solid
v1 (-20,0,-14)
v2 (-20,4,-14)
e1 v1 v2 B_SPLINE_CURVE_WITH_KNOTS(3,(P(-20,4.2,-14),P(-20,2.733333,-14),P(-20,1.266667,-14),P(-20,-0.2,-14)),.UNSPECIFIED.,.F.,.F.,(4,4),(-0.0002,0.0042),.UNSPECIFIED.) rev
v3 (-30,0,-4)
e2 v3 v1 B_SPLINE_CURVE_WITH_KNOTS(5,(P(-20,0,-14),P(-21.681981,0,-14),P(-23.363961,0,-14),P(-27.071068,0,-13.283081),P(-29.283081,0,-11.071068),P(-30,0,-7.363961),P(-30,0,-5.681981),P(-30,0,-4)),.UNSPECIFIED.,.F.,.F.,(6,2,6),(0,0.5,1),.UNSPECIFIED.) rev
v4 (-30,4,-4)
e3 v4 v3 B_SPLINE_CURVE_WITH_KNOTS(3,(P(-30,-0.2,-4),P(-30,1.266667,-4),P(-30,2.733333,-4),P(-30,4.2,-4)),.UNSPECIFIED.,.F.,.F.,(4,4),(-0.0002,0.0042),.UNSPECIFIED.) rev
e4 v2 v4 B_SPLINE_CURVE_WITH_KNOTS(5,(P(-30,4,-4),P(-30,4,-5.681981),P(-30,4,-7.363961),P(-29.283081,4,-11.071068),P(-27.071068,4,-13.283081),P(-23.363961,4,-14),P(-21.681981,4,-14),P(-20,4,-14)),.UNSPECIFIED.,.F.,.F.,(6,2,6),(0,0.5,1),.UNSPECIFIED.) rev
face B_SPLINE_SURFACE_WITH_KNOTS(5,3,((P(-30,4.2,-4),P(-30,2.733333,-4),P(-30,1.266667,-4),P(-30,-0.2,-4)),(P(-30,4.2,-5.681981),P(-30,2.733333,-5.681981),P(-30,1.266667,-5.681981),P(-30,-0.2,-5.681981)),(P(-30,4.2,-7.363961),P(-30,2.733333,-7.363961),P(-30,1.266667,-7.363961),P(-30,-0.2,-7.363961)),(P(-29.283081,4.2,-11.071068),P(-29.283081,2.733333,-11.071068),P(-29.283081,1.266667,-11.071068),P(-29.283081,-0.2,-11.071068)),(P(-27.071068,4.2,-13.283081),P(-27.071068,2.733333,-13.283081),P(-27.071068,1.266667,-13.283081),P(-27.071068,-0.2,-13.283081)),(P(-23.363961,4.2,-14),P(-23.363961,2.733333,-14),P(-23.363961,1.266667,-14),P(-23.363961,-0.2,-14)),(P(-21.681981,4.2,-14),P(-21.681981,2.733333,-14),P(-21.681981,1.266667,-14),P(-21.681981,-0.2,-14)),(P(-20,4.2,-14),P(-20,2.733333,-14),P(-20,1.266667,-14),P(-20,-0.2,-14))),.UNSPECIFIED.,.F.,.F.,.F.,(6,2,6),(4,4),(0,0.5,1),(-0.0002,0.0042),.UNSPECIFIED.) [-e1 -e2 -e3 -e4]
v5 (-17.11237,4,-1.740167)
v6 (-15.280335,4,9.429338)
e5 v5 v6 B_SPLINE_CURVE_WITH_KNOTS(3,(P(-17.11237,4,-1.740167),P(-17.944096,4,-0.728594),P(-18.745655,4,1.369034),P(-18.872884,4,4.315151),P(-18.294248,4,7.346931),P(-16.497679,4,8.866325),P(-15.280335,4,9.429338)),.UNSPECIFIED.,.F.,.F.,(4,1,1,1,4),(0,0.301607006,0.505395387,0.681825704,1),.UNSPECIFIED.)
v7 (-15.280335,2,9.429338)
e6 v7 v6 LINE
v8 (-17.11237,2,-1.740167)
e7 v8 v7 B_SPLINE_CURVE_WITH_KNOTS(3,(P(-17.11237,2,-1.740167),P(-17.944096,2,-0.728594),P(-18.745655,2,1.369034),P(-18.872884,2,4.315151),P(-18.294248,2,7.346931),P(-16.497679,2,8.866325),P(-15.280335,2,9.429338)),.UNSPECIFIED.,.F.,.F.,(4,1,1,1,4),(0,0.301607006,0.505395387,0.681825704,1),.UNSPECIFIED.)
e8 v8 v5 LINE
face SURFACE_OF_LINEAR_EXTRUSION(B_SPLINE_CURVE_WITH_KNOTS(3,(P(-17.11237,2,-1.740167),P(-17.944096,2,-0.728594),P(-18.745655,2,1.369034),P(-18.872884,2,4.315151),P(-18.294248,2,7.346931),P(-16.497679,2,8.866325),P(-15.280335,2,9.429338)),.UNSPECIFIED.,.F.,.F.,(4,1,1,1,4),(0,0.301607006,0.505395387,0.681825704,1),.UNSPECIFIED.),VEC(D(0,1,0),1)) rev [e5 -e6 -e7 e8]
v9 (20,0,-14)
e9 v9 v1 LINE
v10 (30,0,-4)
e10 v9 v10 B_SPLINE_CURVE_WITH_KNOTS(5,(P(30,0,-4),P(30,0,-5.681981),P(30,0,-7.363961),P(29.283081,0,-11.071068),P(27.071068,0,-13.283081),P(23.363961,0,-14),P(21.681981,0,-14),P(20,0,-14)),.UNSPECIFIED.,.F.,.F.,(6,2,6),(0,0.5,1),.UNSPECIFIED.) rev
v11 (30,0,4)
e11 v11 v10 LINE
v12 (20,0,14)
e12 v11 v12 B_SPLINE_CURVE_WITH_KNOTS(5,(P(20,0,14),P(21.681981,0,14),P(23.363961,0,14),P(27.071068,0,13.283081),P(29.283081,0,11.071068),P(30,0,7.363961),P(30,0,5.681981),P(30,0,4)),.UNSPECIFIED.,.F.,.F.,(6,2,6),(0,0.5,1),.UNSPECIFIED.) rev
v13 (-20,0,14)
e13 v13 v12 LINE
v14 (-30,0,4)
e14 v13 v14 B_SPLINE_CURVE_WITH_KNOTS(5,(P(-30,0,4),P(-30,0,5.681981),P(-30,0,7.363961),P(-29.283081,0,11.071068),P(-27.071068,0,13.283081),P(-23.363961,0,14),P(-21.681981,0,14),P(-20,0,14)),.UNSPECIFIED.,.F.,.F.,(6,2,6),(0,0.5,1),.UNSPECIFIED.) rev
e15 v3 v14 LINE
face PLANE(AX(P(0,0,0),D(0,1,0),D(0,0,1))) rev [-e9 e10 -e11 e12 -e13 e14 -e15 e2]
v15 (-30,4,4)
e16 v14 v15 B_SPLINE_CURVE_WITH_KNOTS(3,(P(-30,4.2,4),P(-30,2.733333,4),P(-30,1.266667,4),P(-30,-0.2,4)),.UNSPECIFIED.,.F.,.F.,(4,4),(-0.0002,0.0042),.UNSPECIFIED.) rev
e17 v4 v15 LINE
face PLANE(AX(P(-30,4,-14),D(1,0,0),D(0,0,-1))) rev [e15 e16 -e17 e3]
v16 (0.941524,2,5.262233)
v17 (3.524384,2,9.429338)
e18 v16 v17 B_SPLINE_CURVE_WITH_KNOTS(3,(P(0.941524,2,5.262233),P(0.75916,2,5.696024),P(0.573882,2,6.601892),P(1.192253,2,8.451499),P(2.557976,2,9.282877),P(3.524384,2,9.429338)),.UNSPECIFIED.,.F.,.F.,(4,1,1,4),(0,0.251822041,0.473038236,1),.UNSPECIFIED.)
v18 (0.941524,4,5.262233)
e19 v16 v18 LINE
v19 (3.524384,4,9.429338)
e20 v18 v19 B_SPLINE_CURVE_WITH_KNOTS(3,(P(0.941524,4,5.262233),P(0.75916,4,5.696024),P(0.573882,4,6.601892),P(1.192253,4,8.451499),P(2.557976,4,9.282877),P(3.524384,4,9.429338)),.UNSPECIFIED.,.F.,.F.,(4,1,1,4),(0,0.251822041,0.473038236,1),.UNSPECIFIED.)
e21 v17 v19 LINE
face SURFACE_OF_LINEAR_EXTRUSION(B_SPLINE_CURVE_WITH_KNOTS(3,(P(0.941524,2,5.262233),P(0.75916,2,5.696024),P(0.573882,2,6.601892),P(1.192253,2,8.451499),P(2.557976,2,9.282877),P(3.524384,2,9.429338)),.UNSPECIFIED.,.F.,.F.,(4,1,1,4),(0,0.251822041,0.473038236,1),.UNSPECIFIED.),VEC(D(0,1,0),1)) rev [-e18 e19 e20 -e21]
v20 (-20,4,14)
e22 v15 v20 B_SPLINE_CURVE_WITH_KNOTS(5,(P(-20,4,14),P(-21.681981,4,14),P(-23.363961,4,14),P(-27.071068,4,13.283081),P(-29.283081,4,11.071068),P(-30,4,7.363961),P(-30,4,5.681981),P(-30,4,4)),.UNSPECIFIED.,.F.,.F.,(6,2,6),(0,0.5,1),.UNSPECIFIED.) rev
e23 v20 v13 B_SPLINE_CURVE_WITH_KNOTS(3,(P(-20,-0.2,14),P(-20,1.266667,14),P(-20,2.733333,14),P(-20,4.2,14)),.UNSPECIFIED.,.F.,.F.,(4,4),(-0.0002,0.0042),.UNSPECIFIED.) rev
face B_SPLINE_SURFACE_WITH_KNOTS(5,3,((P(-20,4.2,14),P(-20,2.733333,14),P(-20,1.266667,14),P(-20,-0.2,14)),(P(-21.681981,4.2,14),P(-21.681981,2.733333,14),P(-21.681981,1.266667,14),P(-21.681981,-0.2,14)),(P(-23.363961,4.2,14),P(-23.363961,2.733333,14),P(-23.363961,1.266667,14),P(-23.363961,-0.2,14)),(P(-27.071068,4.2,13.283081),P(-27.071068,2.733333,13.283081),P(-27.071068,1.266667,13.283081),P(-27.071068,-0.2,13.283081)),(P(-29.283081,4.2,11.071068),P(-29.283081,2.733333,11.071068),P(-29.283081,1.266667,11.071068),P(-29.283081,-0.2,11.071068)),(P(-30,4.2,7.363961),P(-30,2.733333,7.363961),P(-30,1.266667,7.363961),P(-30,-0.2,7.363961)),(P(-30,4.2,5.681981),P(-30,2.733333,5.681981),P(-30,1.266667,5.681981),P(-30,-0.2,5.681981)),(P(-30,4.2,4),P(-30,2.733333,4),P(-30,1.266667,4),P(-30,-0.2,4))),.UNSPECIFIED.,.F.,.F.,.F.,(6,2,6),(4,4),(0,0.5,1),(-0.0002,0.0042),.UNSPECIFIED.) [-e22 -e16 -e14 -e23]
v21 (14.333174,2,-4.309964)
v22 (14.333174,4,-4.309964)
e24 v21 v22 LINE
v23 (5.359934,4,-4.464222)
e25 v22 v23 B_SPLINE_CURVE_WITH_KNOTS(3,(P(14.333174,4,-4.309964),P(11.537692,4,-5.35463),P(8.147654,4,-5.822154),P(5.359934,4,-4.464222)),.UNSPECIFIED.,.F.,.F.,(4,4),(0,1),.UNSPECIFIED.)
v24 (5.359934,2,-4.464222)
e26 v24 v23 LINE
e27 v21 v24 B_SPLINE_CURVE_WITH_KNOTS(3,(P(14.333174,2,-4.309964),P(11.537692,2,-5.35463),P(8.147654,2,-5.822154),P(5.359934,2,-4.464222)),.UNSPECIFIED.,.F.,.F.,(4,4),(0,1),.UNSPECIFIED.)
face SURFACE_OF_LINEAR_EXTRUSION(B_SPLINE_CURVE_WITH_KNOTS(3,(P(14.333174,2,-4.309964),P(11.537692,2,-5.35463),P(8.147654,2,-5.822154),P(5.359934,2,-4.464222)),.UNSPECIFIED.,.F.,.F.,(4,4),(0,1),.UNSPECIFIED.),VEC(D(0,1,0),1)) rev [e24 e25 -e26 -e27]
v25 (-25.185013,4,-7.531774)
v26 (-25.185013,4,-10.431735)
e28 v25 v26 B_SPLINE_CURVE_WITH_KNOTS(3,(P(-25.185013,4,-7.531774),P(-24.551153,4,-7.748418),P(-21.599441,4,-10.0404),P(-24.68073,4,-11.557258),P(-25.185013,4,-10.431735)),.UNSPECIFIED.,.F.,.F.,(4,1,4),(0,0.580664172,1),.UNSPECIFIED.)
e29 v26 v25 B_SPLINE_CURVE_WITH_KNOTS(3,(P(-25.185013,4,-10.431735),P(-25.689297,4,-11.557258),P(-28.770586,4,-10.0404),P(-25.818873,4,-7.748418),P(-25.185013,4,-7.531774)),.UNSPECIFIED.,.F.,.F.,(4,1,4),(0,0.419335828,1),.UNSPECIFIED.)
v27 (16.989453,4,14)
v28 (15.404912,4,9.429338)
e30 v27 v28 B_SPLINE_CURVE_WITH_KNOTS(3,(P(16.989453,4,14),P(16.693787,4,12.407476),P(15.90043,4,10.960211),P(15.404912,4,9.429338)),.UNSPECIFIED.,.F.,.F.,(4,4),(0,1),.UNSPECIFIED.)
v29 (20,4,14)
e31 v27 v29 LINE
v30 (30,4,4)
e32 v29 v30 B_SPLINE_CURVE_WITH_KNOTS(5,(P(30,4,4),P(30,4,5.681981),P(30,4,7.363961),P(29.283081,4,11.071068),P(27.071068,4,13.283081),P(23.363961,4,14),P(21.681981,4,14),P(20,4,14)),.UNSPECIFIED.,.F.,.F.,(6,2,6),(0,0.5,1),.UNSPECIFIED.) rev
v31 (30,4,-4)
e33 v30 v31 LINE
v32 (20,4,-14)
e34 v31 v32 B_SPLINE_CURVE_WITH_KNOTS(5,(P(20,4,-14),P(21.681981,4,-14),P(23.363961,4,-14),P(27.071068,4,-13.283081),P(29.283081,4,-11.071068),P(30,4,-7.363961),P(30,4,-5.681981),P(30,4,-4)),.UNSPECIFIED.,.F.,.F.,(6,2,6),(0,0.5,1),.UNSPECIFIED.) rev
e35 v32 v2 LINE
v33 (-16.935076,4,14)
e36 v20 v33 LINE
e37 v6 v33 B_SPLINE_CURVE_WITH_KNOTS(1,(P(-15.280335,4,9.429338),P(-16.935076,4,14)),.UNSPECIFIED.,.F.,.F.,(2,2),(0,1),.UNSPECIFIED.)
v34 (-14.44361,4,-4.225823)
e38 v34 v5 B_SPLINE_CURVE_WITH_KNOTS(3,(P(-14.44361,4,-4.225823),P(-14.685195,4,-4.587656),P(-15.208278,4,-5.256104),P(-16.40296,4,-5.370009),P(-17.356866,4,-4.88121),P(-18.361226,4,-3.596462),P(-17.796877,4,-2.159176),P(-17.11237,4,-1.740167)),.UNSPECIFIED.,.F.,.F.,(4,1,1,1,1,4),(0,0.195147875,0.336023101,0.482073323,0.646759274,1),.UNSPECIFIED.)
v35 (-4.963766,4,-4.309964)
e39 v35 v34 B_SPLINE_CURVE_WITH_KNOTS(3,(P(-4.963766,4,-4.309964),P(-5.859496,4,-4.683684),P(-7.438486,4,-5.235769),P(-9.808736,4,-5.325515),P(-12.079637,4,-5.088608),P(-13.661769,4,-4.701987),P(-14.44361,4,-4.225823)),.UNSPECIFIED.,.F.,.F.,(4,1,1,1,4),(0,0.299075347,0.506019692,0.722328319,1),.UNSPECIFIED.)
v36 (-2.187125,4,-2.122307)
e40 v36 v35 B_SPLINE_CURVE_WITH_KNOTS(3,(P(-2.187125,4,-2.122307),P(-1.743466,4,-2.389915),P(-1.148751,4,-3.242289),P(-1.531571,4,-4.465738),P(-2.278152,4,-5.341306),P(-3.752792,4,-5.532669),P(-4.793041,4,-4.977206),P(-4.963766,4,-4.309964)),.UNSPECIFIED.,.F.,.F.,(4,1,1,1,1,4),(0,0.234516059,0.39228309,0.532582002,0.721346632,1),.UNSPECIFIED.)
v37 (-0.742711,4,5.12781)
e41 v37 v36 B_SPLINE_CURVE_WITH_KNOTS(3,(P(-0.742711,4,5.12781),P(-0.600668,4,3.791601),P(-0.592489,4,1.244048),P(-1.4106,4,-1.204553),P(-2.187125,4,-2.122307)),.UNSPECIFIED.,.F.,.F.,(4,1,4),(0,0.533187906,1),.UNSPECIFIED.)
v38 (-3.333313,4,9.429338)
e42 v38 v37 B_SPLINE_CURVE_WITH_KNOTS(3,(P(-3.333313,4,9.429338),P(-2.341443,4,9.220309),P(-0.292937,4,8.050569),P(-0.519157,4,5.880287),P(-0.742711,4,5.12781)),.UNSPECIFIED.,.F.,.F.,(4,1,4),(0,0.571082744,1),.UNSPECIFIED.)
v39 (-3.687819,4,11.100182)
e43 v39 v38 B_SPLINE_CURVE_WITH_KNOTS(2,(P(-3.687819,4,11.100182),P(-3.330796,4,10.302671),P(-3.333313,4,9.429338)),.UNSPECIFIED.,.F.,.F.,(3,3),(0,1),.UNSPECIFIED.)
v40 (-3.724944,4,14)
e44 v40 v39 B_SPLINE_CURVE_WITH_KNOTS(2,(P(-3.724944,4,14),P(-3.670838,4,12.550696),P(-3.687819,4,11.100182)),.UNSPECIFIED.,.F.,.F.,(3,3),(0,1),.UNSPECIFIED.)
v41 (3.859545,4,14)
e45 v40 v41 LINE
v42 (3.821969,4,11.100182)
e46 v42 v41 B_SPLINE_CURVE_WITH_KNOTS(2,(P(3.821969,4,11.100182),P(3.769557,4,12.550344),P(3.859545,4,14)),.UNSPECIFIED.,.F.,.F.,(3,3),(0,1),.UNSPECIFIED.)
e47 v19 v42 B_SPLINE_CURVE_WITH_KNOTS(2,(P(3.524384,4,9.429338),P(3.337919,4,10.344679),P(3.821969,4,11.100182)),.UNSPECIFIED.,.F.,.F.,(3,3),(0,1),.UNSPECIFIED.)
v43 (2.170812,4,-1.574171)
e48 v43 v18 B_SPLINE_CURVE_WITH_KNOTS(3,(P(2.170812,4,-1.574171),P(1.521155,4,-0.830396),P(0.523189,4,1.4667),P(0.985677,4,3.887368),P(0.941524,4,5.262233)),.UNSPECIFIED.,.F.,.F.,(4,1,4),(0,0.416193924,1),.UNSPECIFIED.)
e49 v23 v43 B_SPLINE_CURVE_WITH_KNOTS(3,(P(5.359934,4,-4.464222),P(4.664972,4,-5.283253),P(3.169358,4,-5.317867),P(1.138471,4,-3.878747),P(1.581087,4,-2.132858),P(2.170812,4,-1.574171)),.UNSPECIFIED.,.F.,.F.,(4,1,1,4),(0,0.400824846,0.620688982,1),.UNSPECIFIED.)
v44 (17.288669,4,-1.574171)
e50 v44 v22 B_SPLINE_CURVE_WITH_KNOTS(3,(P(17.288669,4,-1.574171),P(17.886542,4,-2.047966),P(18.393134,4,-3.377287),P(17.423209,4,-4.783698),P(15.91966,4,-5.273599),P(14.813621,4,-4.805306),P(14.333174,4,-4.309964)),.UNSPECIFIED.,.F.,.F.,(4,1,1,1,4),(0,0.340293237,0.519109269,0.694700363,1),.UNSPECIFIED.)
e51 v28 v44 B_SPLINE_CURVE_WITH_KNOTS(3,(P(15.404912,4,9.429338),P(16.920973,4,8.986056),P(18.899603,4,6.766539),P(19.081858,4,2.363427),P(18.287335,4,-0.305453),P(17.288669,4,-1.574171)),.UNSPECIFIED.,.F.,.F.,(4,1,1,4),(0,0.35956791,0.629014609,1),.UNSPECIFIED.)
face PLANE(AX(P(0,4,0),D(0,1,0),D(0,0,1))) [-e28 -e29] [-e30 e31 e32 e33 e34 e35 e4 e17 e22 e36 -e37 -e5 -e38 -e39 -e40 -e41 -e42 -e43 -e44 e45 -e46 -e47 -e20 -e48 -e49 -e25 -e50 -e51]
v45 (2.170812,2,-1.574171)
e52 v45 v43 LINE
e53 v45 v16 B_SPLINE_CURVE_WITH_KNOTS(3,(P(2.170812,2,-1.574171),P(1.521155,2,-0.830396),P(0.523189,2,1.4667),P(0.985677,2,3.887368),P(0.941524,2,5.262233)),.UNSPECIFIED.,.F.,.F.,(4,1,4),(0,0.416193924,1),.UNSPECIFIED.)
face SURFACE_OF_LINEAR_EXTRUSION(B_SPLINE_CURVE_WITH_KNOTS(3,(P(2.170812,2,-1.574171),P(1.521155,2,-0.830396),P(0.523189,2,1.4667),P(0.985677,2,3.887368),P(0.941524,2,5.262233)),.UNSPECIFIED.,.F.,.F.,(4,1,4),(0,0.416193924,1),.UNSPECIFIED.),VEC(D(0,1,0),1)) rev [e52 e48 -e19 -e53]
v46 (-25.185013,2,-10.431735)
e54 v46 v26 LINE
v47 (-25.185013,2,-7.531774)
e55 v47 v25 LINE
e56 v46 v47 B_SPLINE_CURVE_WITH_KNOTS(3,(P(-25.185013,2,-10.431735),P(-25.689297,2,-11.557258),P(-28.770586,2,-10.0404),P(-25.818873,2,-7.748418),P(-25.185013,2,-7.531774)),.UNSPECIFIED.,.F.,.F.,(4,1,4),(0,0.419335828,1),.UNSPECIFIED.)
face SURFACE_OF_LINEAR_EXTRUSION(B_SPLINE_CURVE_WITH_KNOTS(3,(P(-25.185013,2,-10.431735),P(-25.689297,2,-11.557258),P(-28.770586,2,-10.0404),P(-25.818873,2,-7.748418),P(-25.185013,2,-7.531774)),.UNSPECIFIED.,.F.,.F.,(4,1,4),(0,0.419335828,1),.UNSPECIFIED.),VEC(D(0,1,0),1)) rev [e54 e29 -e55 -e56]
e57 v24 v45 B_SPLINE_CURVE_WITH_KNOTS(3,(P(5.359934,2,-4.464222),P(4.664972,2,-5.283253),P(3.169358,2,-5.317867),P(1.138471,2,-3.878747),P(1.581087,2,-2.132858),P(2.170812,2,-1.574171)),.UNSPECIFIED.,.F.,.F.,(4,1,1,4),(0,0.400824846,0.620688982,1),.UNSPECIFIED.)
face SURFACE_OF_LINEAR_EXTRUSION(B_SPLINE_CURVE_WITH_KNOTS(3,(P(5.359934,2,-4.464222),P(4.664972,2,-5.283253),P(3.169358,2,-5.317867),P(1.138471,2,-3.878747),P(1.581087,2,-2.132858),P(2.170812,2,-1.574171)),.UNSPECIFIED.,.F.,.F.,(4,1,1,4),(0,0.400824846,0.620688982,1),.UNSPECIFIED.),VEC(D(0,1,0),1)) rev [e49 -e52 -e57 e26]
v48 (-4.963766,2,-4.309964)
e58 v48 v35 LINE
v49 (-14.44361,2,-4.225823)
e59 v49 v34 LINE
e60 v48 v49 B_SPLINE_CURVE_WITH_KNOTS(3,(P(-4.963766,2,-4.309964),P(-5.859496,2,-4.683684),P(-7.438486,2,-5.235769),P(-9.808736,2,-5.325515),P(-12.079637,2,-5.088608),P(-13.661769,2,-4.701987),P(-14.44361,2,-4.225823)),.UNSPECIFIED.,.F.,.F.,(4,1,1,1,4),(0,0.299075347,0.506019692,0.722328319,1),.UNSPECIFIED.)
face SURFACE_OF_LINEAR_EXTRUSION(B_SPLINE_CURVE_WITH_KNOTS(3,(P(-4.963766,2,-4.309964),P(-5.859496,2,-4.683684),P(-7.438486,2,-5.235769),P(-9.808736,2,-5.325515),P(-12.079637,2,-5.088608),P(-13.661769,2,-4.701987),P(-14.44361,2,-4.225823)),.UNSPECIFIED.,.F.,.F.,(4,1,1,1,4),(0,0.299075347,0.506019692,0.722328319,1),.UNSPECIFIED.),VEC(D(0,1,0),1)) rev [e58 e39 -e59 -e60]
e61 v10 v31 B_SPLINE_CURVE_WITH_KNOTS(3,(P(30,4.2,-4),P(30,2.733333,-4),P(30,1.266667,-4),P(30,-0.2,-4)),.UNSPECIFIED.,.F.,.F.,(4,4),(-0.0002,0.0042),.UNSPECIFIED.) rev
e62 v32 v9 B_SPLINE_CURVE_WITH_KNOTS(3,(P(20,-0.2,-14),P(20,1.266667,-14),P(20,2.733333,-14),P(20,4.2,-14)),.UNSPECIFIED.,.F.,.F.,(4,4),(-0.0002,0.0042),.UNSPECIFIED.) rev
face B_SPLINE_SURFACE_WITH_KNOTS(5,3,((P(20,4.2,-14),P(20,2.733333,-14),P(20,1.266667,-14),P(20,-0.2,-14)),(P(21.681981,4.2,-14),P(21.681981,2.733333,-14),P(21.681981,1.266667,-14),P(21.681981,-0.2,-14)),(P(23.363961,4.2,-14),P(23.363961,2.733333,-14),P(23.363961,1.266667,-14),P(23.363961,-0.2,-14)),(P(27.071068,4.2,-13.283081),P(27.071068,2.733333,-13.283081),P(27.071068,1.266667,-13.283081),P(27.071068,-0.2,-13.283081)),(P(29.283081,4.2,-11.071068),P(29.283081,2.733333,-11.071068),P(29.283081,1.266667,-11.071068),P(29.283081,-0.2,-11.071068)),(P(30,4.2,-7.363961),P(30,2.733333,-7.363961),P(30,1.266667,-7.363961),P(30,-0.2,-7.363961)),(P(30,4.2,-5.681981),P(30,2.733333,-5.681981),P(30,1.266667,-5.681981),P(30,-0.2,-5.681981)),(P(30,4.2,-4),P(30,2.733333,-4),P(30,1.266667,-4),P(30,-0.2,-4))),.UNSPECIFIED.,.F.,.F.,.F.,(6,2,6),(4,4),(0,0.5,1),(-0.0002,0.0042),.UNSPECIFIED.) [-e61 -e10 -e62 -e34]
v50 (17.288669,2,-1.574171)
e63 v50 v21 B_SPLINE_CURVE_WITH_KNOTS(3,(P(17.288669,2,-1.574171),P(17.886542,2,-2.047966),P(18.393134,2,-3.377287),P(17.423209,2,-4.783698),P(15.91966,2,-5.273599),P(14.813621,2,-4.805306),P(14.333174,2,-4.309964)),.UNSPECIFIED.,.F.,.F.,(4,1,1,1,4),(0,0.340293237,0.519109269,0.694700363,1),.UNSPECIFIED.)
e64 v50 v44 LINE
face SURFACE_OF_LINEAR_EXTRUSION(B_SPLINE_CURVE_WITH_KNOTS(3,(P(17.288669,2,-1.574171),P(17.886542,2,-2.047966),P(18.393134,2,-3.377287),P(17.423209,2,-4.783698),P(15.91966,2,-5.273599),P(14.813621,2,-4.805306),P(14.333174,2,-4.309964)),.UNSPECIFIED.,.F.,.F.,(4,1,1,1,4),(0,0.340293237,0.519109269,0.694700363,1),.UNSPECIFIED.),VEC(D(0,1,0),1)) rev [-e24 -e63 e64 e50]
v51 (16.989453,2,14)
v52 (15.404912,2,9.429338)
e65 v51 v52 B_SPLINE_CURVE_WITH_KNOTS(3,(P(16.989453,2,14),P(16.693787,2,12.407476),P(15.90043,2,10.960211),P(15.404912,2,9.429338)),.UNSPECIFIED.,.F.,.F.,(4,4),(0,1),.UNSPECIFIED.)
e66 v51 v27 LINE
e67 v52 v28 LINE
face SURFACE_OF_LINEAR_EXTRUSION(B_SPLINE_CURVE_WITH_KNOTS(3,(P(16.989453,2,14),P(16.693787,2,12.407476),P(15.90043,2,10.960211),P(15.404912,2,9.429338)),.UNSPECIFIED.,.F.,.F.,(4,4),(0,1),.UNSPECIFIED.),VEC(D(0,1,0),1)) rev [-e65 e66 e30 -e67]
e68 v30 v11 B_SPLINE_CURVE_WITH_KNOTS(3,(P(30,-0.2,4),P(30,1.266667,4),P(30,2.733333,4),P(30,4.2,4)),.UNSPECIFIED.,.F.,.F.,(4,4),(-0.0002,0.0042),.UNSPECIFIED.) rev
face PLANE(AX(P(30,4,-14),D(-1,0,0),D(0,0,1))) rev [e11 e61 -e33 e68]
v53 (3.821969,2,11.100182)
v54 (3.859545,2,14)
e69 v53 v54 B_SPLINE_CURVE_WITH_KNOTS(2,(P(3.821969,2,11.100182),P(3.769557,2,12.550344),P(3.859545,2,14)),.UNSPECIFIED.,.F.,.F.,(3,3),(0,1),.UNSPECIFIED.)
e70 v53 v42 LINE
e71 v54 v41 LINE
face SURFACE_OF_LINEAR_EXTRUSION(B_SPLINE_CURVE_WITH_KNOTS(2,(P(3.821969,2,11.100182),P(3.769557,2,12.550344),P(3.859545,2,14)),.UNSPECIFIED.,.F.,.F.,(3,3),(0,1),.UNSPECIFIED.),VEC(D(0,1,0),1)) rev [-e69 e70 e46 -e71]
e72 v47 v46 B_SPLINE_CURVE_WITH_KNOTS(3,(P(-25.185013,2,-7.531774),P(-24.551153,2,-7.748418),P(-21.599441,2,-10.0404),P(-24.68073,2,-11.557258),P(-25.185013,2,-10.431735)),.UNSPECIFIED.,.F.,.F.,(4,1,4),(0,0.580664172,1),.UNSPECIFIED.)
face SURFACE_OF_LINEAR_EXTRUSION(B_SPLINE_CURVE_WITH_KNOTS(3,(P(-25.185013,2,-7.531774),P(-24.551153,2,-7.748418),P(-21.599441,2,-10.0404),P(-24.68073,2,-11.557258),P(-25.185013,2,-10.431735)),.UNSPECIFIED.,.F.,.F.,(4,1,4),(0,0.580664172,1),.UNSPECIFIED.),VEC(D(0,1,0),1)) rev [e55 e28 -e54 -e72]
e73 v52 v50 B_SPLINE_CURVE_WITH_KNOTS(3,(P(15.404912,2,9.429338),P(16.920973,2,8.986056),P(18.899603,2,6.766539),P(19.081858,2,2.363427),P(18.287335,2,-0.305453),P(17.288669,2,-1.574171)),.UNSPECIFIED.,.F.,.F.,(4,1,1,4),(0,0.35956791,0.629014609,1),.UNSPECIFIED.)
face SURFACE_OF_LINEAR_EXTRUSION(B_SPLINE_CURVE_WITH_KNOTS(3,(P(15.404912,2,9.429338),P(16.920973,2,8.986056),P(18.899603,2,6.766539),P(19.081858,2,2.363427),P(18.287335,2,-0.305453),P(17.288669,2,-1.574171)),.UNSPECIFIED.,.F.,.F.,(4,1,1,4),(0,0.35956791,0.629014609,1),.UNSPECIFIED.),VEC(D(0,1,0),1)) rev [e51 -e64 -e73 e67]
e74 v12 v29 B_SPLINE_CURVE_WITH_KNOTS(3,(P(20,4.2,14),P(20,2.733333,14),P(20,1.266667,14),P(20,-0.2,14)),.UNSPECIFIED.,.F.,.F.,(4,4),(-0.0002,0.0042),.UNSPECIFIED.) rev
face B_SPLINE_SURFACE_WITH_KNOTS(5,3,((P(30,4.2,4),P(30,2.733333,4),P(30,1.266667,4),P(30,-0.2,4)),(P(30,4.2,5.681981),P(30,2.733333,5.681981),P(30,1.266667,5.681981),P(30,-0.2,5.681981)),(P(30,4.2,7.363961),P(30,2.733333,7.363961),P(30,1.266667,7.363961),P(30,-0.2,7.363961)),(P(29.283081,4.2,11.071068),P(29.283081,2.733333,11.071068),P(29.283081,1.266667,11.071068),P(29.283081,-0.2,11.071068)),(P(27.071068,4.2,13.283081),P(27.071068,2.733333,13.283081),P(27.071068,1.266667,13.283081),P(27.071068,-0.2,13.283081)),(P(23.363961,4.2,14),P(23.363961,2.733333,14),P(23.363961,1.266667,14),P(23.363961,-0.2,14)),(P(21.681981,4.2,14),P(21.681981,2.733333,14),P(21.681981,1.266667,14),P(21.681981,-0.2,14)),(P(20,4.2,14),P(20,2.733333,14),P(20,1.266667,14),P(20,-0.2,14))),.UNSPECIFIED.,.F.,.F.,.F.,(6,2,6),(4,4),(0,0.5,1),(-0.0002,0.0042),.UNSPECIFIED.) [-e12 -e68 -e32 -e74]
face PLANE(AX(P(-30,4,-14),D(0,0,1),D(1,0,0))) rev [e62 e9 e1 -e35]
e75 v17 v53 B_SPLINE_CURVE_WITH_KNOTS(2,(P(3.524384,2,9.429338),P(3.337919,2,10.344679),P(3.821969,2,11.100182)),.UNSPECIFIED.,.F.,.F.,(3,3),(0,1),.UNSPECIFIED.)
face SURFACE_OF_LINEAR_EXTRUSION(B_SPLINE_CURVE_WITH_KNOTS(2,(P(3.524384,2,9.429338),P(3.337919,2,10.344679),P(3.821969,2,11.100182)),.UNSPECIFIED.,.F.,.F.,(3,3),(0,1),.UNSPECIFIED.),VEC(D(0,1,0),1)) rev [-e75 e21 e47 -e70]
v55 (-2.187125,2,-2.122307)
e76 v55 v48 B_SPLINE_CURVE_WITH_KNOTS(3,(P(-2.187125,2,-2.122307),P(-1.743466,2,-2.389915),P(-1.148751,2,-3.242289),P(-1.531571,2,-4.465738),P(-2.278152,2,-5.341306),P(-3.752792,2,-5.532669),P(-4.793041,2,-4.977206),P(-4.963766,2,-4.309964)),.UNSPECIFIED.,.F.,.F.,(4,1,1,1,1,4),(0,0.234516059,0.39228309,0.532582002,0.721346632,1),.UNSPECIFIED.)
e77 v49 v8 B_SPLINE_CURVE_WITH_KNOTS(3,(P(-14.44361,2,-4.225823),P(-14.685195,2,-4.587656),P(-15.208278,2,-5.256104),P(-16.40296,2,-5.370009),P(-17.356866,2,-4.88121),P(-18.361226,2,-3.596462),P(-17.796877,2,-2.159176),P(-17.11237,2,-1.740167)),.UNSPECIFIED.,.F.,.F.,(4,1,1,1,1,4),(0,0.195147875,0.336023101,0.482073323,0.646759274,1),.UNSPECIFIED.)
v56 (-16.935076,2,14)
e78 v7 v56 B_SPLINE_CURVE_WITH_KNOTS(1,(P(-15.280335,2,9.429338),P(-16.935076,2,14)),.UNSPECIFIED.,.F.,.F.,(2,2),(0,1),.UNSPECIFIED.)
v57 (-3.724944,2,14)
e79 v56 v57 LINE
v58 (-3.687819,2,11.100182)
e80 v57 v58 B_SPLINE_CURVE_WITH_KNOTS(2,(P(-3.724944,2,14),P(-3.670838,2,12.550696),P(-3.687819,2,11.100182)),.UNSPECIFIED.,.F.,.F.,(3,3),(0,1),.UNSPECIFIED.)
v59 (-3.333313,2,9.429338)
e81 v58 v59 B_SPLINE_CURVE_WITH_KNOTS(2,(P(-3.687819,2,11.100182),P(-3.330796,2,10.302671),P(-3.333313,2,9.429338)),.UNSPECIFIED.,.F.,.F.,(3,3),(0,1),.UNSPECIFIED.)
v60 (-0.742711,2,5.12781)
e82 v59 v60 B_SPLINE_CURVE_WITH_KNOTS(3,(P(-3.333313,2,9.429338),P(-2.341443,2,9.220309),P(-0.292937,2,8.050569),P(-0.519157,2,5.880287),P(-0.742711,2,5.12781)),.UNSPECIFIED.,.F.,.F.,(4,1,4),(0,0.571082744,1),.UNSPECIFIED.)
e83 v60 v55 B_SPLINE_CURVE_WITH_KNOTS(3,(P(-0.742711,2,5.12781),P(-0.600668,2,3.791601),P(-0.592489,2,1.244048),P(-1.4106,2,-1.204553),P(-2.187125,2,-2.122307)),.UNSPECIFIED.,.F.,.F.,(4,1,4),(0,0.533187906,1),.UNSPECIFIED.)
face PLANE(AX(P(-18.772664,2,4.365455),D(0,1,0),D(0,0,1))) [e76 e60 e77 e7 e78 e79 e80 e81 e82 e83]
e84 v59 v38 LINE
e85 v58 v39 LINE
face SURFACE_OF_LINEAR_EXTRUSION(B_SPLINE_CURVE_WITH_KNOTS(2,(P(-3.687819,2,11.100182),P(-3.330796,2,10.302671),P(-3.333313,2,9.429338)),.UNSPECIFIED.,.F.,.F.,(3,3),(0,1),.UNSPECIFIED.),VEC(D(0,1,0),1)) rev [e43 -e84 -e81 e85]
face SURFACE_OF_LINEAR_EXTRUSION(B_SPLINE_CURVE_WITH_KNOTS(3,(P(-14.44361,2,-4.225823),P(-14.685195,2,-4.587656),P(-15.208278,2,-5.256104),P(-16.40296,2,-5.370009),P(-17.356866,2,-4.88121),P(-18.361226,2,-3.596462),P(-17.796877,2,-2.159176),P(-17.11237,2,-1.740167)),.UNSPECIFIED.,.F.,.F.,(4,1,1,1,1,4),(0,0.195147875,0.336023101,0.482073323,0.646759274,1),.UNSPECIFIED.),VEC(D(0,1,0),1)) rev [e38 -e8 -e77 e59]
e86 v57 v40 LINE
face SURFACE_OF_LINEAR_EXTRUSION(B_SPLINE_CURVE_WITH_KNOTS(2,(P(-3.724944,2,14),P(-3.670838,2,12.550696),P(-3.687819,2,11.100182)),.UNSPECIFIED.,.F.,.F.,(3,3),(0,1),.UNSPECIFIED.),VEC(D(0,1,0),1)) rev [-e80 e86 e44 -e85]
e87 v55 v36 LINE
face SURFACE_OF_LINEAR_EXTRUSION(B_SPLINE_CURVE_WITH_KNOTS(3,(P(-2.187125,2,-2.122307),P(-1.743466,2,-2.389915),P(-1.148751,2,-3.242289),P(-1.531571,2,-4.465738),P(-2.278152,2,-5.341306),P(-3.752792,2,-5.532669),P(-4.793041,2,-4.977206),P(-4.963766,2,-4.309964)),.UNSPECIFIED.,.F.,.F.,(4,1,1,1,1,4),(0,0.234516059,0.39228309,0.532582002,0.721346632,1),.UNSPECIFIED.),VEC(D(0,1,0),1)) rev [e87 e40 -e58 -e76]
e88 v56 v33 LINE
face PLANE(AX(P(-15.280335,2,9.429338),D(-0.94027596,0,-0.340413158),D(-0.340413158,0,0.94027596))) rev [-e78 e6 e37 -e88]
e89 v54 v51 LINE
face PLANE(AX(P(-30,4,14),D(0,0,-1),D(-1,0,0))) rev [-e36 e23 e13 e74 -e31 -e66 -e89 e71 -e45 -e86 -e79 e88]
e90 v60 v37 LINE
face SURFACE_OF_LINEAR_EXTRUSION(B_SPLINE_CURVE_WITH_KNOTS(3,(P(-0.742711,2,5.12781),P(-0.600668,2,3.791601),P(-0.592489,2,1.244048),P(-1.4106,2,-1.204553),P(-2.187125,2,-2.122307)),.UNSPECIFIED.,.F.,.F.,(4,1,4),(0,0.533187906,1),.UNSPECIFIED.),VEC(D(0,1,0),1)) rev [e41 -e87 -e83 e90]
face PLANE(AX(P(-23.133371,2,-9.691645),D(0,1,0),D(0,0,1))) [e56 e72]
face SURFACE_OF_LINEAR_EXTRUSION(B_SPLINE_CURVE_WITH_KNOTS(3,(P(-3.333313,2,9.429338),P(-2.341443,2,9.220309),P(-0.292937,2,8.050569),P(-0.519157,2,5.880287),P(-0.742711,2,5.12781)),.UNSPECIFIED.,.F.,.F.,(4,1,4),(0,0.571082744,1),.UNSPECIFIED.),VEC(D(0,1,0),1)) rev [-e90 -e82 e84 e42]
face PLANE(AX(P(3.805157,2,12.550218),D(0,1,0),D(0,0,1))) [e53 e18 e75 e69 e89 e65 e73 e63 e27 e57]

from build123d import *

# Parameters (mm, degrees)
SKETCH_1_W          = 60
SKETCH_1_H          = 28
EXTRUDE_1_DEPTH     = 4
FILLET_1_SIZE       = 10
CUT_EXTRUDE_1_DEPTH = 2


with BuildPart() as part:
    # 草图1 → 凸台-拉伸1 (new body)
    with BuildSketch(Plane(origin=(0, 0, 0), x_dir=(1, 0, 0), z_dir=(0, 1, 0))):
        Rectangle(SKETCH_1_W, SKETCH_1_H)
    extrude(amount=EXTRUDE_1_DEPTH)

    # 圆角1
    # a fillet whose section is not a circle: 10 mm, written as the material it takes off along each edge
    with BuildSketch(Plane(origin=(30, -25, 14), x_dir=(0, 0, -1), z_dir=(0, 1, 0)), Plane(origin=(30, -25, -14), x_dir=(-1, 0, 0), z_dir=(0, 1, 0)), Plane(origin=(-30, -25, 14), x_dir=(1, 0, 0), z_dir=(0, 1, 0))) as fillet_1_piece_1:
        with BuildLine():
            add(Edge.make_bspline([(FILLET_1_SIZE, 0), (FILLET_1_SIZE * 0.831801948466, 0), (FILLET_1_SIZE * 0.663603896932, 0), (FILLET_1_SIZE * 0.292893218813, FILLET_1_SIZE * 0.0716919198361), (FILLET_1_SIZE * 0.0716919198361, FILLET_1_SIZE * 0.292893218813), (0, FILLET_1_SIZE * 0.663603896932), (0, FILLET_1_SIZE * 0.831801948466), (0, FILLET_1_SIZE)], knots=[0, 0, 0, 0, 0, 0, 0.5, 0.5, 1, 1, 1, 1, 1, 1], degree=5))
            Line((0, FILLET_1_SIZE), (0, 0))
            Line((0, 0), (FILLET_1_SIZE, 0))
        make_face()
    extrude(amount=54, mode=Mode.SUBTRACT)
    with BuildSketch(Plane(origin=(-30, -25, -14), x_dir=(1, 0, 0), z_dir=(0, 1, 0))) as fillet_1_piece_2:
        with BuildLine():
            add(Edge.make_bspline([(FILLET_1_SIZE, 0), (FILLET_1_SIZE * 0.831801948466, 0), (FILLET_1_SIZE * 0.663603896932, 0), (FILLET_1_SIZE * 0.292893218813, -FILLET_1_SIZE * 0.0716919198361), (FILLET_1_SIZE * 0.0716919198361, -FILLET_1_SIZE * 0.292893218813), (0, -FILLET_1_SIZE * 0.663603896932), (0, -FILLET_1_SIZE * 0.831801948466), (0, -FILLET_1_SIZE)], knots=[0, 0, 0, 0, 0, 0, 0.5, 0.5, 1, 1, 1, 1, 1, 1], degree=5))
            Line((0, -FILLET_1_SIZE), (0, 0))
            Line((0, 0), (FILLET_1_SIZE, 0))
        make_face()
    extrude(amount=54, mode=Mode.SUBTRACT)

    # 草图2 → 切除-拉伸1 (cut)
    with BuildSketch(Plane(origin=(0, 4, 0), x_dir=(1, 0, 0), z_dir=(0, 1, 0))):
        with BuildLine():
            Line((-16.935076069, -14), (-3.724944257, -14))
            add(Edge.make_bspline(
                [(-3.687819463, -11.10018183), (-3.670837845, -12.550695913), (-3.724944257, -14)],
                knots=[0, 0, 0, 1, 1, 1], degree=2))
            add(Edge.make_bspline(
                [(-3.333312713, -9.429337618), (-3.330795543, -10.302670918), (-3.687819463, -11.10018183)],
                knots=[0, 0, 0, 1, 1, 1], degree=2))
            add(Edge.make_bspline(
                [(-0.742711054, -5.127809832), (-0.519156675, -5.880287043), (-0.292936969, -8.050568721), (-2.341442668, -9.22030854), (-3.333312713, -9.429337618)],
                knots=[0, 0, 0, 0, 0.428917256, 1, 1, 1, 1], degree=3))
            add(Edge.make_bspline(
                [(-2.187125143, 2.12230749), (-1.4106002, 1.204552618), (-0.592489001, -1.244047904), (-0.600668316, -3.791601167), (-0.742711054, -5.127809832)],
                knots=[0, 0, 0, 0, 0.466812094, 1, 1, 1, 1], degree=3))
            add(Edge.make_bspline(
                [(-4.963765819, 4.30996378), (-4.793040938, 4.977205844), (-3.75279166, 5.532669201), (-2.278151789, 5.341305653), (-1.531570873, 4.465738286), (-1.148751049, 3.242289174), (-1.743465674, 2.389914822), (-2.187125143, 2.12230749)],
                knots=[0, 0, 0, 0, 0.278653368, 0.467417998, 0.60771691, 0.765483941, 1, 1, 1, 1], degree=3))
            add(Edge.make_bspline(
                [(-14.443609745, 4.225823154), (-13.661769199, 4.701986871), (-12.07963713, 5.088608477), (-9.80873584, 5.325514917), (-7.438485821, 5.235768859), (-5.859496423, 4.683683956), (-4.963765819, 4.30996378)],
                knots=[0, 0, 0, 0, 0.277671681, 0.493980308, 0.700924653, 1, 1, 1, 1], degree=3))
            add(Edge.make_bspline(
                [(-17.112369797, 1.740167248), (-17.796876509, 2.159176308), (-18.361225861, 3.59646204), (-17.356865882, 4.881210301), (-16.40295998, 5.370009473), (-15.208277597, 5.256104096), (-14.685195355, 4.587656422), (-14.443609745, 4.225823154)],
                knots=[0, 0, 0, 0, 0.353240726, 0.517926677, 0.663976899, 0.804852125, 1, 1, 1, 1], degree=3))
            add(Edge.make_bspline(
                [(-15.280334608, -9.429337618), (-16.497678509, -8.866325433), (-18.294247529, -7.346930593), (-18.872884283, -4.315150537), (-18.745655148, -1.369033801), (-17.944096186, 0.728594057), (-17.112369797, 1.740167248)],
                knots=[0, 0, 0, 0, 0.318174296, 0.494604613, 0.698392994, 1, 1, 1, 1], degree=3))
            Line((-15.280334608, -9.429337618), (-16.935076069, -14))
        make_face()
        with BuildLine():
            Line((3.859545005, -14), (16.989453484, -14))
            add(Edge.make_bspline(
                [(15.404911602, -9.429337618), (15.900430103, -10.960211179), (16.69378742, -12.407476359), (16.989453484, -14)],
                knots=[0, 0, 0, 0, 1, 1, 1, 1], degree=3))
            add(Edge.make_bspline(
                [(17.288668554, 1.574170629), (18.287334611, 0.305452853), (19.081858131, -2.363427448), (18.899603104, -6.766539361), (16.920972519, -8.986056385), (15.404911602, -9.429337618)],
                knots=[0, 0, 0, 0, 0.370985391, 0.64043209, 1, 1, 1, 1], degree=3))
            add(Edge.make_bspline(
                [(14.333173858, 4.30996378), (14.813620622, 4.805305608), (15.919659705, 5.273598818), (17.423209254, 4.783697576), (18.393133704, 3.377287394), (17.886541605, 2.047965808), (17.288668554, 1.574170629)],
                knots=[0, 0, 0, 0, 0.305299637, 0.480890731, 0.659706763, 1, 1, 1, 1], degree=3))
            add(Edge.make_bspline(
                [(5.359934346, 4.464221596), (8.147654076, 5.822153518), (11.537691595, 5.354629666), (14.333173858, 4.30996378)],
                knots=[0, 0, 0, 0, 1, 1, 1, 1], degree=3))
            add(Edge.make_bspline(
                [(2.170811741, 1.574170629), (1.581087403, 2.132858214), (1.138470768, 3.878747123), (3.169357766, 5.317866652), (4.664971625, 5.28325304), (5.359934346, 4.464221596)],
                knots=[0, 0, 0, 0, 0.379311018, 0.599175154, 1, 1, 1, 1], degree=3))
            add(Edge.make_bspline(
                [(0.941523625, -5.262232932), (0.98567745, -3.887367548), (0.523188823, -1.466699515), (1.521155106, 0.830396312), (2.170811741, 1.574170629)],
                knots=[0, 0, 0, 0, 0.583806076, 1, 1, 1, 1], degree=3))
            add(Edge.make_bspline(
                [(3.524384204, -9.429337618), (2.557976333, -9.282877204), (1.192253003, -8.451499296), (0.573882177, -6.601892019), (0.759159881, -5.696024028), (0.941523625, -5.262232932)],
                knots=[0, 0, 0, 0, 0.526961764, 0.748177959, 1, 1, 1, 1], degree=3))
            add(Edge.make_bspline(
                [(3.821968614, -11.10018183), (3.337919448, -10.344678931), (3.524384204, -9.429337618)],
                knots=[0, 0, 0, 1, 1, 1], degree=2))
            add(Edge.make_bspline(
                [(3.859545005, -14), (3.769556535, -12.550344491), (3.821968614, -11.10018183)],
                knots=[0, 0, 0, 1, 1, 1], degree=2))
        make_face()
        with BuildLine():
            add(Edge.make_bspline(
                [(-25.185013425, 10.431735443), (-25.689297318, 11.557258243), (-28.770586094, 10.040399625), (-25.818873431, 7.748418433), (-25.185013425, 7.531774201)],
                knots=[0, 0, 0, 0, 0.419335828, 1, 1, 1, 1], degree=3))
            add(Edge.make_bspline(
                [(-25.185013425, 10.431735443), (-24.680729531, 11.557258243), (-21.599440755, 10.040399625), (-24.551153418, 7.748418433), (-25.185013425, 7.531774201)],
                knots=[0, 0, 0, 0, 0.419335828, 1, 1, 1, 1], degree=3))
        make_face()
    extrude(amount=-CUT_EXTRUDE_1_DEPTH, mode=Mode.SUBTRACT)


solid = part.part
